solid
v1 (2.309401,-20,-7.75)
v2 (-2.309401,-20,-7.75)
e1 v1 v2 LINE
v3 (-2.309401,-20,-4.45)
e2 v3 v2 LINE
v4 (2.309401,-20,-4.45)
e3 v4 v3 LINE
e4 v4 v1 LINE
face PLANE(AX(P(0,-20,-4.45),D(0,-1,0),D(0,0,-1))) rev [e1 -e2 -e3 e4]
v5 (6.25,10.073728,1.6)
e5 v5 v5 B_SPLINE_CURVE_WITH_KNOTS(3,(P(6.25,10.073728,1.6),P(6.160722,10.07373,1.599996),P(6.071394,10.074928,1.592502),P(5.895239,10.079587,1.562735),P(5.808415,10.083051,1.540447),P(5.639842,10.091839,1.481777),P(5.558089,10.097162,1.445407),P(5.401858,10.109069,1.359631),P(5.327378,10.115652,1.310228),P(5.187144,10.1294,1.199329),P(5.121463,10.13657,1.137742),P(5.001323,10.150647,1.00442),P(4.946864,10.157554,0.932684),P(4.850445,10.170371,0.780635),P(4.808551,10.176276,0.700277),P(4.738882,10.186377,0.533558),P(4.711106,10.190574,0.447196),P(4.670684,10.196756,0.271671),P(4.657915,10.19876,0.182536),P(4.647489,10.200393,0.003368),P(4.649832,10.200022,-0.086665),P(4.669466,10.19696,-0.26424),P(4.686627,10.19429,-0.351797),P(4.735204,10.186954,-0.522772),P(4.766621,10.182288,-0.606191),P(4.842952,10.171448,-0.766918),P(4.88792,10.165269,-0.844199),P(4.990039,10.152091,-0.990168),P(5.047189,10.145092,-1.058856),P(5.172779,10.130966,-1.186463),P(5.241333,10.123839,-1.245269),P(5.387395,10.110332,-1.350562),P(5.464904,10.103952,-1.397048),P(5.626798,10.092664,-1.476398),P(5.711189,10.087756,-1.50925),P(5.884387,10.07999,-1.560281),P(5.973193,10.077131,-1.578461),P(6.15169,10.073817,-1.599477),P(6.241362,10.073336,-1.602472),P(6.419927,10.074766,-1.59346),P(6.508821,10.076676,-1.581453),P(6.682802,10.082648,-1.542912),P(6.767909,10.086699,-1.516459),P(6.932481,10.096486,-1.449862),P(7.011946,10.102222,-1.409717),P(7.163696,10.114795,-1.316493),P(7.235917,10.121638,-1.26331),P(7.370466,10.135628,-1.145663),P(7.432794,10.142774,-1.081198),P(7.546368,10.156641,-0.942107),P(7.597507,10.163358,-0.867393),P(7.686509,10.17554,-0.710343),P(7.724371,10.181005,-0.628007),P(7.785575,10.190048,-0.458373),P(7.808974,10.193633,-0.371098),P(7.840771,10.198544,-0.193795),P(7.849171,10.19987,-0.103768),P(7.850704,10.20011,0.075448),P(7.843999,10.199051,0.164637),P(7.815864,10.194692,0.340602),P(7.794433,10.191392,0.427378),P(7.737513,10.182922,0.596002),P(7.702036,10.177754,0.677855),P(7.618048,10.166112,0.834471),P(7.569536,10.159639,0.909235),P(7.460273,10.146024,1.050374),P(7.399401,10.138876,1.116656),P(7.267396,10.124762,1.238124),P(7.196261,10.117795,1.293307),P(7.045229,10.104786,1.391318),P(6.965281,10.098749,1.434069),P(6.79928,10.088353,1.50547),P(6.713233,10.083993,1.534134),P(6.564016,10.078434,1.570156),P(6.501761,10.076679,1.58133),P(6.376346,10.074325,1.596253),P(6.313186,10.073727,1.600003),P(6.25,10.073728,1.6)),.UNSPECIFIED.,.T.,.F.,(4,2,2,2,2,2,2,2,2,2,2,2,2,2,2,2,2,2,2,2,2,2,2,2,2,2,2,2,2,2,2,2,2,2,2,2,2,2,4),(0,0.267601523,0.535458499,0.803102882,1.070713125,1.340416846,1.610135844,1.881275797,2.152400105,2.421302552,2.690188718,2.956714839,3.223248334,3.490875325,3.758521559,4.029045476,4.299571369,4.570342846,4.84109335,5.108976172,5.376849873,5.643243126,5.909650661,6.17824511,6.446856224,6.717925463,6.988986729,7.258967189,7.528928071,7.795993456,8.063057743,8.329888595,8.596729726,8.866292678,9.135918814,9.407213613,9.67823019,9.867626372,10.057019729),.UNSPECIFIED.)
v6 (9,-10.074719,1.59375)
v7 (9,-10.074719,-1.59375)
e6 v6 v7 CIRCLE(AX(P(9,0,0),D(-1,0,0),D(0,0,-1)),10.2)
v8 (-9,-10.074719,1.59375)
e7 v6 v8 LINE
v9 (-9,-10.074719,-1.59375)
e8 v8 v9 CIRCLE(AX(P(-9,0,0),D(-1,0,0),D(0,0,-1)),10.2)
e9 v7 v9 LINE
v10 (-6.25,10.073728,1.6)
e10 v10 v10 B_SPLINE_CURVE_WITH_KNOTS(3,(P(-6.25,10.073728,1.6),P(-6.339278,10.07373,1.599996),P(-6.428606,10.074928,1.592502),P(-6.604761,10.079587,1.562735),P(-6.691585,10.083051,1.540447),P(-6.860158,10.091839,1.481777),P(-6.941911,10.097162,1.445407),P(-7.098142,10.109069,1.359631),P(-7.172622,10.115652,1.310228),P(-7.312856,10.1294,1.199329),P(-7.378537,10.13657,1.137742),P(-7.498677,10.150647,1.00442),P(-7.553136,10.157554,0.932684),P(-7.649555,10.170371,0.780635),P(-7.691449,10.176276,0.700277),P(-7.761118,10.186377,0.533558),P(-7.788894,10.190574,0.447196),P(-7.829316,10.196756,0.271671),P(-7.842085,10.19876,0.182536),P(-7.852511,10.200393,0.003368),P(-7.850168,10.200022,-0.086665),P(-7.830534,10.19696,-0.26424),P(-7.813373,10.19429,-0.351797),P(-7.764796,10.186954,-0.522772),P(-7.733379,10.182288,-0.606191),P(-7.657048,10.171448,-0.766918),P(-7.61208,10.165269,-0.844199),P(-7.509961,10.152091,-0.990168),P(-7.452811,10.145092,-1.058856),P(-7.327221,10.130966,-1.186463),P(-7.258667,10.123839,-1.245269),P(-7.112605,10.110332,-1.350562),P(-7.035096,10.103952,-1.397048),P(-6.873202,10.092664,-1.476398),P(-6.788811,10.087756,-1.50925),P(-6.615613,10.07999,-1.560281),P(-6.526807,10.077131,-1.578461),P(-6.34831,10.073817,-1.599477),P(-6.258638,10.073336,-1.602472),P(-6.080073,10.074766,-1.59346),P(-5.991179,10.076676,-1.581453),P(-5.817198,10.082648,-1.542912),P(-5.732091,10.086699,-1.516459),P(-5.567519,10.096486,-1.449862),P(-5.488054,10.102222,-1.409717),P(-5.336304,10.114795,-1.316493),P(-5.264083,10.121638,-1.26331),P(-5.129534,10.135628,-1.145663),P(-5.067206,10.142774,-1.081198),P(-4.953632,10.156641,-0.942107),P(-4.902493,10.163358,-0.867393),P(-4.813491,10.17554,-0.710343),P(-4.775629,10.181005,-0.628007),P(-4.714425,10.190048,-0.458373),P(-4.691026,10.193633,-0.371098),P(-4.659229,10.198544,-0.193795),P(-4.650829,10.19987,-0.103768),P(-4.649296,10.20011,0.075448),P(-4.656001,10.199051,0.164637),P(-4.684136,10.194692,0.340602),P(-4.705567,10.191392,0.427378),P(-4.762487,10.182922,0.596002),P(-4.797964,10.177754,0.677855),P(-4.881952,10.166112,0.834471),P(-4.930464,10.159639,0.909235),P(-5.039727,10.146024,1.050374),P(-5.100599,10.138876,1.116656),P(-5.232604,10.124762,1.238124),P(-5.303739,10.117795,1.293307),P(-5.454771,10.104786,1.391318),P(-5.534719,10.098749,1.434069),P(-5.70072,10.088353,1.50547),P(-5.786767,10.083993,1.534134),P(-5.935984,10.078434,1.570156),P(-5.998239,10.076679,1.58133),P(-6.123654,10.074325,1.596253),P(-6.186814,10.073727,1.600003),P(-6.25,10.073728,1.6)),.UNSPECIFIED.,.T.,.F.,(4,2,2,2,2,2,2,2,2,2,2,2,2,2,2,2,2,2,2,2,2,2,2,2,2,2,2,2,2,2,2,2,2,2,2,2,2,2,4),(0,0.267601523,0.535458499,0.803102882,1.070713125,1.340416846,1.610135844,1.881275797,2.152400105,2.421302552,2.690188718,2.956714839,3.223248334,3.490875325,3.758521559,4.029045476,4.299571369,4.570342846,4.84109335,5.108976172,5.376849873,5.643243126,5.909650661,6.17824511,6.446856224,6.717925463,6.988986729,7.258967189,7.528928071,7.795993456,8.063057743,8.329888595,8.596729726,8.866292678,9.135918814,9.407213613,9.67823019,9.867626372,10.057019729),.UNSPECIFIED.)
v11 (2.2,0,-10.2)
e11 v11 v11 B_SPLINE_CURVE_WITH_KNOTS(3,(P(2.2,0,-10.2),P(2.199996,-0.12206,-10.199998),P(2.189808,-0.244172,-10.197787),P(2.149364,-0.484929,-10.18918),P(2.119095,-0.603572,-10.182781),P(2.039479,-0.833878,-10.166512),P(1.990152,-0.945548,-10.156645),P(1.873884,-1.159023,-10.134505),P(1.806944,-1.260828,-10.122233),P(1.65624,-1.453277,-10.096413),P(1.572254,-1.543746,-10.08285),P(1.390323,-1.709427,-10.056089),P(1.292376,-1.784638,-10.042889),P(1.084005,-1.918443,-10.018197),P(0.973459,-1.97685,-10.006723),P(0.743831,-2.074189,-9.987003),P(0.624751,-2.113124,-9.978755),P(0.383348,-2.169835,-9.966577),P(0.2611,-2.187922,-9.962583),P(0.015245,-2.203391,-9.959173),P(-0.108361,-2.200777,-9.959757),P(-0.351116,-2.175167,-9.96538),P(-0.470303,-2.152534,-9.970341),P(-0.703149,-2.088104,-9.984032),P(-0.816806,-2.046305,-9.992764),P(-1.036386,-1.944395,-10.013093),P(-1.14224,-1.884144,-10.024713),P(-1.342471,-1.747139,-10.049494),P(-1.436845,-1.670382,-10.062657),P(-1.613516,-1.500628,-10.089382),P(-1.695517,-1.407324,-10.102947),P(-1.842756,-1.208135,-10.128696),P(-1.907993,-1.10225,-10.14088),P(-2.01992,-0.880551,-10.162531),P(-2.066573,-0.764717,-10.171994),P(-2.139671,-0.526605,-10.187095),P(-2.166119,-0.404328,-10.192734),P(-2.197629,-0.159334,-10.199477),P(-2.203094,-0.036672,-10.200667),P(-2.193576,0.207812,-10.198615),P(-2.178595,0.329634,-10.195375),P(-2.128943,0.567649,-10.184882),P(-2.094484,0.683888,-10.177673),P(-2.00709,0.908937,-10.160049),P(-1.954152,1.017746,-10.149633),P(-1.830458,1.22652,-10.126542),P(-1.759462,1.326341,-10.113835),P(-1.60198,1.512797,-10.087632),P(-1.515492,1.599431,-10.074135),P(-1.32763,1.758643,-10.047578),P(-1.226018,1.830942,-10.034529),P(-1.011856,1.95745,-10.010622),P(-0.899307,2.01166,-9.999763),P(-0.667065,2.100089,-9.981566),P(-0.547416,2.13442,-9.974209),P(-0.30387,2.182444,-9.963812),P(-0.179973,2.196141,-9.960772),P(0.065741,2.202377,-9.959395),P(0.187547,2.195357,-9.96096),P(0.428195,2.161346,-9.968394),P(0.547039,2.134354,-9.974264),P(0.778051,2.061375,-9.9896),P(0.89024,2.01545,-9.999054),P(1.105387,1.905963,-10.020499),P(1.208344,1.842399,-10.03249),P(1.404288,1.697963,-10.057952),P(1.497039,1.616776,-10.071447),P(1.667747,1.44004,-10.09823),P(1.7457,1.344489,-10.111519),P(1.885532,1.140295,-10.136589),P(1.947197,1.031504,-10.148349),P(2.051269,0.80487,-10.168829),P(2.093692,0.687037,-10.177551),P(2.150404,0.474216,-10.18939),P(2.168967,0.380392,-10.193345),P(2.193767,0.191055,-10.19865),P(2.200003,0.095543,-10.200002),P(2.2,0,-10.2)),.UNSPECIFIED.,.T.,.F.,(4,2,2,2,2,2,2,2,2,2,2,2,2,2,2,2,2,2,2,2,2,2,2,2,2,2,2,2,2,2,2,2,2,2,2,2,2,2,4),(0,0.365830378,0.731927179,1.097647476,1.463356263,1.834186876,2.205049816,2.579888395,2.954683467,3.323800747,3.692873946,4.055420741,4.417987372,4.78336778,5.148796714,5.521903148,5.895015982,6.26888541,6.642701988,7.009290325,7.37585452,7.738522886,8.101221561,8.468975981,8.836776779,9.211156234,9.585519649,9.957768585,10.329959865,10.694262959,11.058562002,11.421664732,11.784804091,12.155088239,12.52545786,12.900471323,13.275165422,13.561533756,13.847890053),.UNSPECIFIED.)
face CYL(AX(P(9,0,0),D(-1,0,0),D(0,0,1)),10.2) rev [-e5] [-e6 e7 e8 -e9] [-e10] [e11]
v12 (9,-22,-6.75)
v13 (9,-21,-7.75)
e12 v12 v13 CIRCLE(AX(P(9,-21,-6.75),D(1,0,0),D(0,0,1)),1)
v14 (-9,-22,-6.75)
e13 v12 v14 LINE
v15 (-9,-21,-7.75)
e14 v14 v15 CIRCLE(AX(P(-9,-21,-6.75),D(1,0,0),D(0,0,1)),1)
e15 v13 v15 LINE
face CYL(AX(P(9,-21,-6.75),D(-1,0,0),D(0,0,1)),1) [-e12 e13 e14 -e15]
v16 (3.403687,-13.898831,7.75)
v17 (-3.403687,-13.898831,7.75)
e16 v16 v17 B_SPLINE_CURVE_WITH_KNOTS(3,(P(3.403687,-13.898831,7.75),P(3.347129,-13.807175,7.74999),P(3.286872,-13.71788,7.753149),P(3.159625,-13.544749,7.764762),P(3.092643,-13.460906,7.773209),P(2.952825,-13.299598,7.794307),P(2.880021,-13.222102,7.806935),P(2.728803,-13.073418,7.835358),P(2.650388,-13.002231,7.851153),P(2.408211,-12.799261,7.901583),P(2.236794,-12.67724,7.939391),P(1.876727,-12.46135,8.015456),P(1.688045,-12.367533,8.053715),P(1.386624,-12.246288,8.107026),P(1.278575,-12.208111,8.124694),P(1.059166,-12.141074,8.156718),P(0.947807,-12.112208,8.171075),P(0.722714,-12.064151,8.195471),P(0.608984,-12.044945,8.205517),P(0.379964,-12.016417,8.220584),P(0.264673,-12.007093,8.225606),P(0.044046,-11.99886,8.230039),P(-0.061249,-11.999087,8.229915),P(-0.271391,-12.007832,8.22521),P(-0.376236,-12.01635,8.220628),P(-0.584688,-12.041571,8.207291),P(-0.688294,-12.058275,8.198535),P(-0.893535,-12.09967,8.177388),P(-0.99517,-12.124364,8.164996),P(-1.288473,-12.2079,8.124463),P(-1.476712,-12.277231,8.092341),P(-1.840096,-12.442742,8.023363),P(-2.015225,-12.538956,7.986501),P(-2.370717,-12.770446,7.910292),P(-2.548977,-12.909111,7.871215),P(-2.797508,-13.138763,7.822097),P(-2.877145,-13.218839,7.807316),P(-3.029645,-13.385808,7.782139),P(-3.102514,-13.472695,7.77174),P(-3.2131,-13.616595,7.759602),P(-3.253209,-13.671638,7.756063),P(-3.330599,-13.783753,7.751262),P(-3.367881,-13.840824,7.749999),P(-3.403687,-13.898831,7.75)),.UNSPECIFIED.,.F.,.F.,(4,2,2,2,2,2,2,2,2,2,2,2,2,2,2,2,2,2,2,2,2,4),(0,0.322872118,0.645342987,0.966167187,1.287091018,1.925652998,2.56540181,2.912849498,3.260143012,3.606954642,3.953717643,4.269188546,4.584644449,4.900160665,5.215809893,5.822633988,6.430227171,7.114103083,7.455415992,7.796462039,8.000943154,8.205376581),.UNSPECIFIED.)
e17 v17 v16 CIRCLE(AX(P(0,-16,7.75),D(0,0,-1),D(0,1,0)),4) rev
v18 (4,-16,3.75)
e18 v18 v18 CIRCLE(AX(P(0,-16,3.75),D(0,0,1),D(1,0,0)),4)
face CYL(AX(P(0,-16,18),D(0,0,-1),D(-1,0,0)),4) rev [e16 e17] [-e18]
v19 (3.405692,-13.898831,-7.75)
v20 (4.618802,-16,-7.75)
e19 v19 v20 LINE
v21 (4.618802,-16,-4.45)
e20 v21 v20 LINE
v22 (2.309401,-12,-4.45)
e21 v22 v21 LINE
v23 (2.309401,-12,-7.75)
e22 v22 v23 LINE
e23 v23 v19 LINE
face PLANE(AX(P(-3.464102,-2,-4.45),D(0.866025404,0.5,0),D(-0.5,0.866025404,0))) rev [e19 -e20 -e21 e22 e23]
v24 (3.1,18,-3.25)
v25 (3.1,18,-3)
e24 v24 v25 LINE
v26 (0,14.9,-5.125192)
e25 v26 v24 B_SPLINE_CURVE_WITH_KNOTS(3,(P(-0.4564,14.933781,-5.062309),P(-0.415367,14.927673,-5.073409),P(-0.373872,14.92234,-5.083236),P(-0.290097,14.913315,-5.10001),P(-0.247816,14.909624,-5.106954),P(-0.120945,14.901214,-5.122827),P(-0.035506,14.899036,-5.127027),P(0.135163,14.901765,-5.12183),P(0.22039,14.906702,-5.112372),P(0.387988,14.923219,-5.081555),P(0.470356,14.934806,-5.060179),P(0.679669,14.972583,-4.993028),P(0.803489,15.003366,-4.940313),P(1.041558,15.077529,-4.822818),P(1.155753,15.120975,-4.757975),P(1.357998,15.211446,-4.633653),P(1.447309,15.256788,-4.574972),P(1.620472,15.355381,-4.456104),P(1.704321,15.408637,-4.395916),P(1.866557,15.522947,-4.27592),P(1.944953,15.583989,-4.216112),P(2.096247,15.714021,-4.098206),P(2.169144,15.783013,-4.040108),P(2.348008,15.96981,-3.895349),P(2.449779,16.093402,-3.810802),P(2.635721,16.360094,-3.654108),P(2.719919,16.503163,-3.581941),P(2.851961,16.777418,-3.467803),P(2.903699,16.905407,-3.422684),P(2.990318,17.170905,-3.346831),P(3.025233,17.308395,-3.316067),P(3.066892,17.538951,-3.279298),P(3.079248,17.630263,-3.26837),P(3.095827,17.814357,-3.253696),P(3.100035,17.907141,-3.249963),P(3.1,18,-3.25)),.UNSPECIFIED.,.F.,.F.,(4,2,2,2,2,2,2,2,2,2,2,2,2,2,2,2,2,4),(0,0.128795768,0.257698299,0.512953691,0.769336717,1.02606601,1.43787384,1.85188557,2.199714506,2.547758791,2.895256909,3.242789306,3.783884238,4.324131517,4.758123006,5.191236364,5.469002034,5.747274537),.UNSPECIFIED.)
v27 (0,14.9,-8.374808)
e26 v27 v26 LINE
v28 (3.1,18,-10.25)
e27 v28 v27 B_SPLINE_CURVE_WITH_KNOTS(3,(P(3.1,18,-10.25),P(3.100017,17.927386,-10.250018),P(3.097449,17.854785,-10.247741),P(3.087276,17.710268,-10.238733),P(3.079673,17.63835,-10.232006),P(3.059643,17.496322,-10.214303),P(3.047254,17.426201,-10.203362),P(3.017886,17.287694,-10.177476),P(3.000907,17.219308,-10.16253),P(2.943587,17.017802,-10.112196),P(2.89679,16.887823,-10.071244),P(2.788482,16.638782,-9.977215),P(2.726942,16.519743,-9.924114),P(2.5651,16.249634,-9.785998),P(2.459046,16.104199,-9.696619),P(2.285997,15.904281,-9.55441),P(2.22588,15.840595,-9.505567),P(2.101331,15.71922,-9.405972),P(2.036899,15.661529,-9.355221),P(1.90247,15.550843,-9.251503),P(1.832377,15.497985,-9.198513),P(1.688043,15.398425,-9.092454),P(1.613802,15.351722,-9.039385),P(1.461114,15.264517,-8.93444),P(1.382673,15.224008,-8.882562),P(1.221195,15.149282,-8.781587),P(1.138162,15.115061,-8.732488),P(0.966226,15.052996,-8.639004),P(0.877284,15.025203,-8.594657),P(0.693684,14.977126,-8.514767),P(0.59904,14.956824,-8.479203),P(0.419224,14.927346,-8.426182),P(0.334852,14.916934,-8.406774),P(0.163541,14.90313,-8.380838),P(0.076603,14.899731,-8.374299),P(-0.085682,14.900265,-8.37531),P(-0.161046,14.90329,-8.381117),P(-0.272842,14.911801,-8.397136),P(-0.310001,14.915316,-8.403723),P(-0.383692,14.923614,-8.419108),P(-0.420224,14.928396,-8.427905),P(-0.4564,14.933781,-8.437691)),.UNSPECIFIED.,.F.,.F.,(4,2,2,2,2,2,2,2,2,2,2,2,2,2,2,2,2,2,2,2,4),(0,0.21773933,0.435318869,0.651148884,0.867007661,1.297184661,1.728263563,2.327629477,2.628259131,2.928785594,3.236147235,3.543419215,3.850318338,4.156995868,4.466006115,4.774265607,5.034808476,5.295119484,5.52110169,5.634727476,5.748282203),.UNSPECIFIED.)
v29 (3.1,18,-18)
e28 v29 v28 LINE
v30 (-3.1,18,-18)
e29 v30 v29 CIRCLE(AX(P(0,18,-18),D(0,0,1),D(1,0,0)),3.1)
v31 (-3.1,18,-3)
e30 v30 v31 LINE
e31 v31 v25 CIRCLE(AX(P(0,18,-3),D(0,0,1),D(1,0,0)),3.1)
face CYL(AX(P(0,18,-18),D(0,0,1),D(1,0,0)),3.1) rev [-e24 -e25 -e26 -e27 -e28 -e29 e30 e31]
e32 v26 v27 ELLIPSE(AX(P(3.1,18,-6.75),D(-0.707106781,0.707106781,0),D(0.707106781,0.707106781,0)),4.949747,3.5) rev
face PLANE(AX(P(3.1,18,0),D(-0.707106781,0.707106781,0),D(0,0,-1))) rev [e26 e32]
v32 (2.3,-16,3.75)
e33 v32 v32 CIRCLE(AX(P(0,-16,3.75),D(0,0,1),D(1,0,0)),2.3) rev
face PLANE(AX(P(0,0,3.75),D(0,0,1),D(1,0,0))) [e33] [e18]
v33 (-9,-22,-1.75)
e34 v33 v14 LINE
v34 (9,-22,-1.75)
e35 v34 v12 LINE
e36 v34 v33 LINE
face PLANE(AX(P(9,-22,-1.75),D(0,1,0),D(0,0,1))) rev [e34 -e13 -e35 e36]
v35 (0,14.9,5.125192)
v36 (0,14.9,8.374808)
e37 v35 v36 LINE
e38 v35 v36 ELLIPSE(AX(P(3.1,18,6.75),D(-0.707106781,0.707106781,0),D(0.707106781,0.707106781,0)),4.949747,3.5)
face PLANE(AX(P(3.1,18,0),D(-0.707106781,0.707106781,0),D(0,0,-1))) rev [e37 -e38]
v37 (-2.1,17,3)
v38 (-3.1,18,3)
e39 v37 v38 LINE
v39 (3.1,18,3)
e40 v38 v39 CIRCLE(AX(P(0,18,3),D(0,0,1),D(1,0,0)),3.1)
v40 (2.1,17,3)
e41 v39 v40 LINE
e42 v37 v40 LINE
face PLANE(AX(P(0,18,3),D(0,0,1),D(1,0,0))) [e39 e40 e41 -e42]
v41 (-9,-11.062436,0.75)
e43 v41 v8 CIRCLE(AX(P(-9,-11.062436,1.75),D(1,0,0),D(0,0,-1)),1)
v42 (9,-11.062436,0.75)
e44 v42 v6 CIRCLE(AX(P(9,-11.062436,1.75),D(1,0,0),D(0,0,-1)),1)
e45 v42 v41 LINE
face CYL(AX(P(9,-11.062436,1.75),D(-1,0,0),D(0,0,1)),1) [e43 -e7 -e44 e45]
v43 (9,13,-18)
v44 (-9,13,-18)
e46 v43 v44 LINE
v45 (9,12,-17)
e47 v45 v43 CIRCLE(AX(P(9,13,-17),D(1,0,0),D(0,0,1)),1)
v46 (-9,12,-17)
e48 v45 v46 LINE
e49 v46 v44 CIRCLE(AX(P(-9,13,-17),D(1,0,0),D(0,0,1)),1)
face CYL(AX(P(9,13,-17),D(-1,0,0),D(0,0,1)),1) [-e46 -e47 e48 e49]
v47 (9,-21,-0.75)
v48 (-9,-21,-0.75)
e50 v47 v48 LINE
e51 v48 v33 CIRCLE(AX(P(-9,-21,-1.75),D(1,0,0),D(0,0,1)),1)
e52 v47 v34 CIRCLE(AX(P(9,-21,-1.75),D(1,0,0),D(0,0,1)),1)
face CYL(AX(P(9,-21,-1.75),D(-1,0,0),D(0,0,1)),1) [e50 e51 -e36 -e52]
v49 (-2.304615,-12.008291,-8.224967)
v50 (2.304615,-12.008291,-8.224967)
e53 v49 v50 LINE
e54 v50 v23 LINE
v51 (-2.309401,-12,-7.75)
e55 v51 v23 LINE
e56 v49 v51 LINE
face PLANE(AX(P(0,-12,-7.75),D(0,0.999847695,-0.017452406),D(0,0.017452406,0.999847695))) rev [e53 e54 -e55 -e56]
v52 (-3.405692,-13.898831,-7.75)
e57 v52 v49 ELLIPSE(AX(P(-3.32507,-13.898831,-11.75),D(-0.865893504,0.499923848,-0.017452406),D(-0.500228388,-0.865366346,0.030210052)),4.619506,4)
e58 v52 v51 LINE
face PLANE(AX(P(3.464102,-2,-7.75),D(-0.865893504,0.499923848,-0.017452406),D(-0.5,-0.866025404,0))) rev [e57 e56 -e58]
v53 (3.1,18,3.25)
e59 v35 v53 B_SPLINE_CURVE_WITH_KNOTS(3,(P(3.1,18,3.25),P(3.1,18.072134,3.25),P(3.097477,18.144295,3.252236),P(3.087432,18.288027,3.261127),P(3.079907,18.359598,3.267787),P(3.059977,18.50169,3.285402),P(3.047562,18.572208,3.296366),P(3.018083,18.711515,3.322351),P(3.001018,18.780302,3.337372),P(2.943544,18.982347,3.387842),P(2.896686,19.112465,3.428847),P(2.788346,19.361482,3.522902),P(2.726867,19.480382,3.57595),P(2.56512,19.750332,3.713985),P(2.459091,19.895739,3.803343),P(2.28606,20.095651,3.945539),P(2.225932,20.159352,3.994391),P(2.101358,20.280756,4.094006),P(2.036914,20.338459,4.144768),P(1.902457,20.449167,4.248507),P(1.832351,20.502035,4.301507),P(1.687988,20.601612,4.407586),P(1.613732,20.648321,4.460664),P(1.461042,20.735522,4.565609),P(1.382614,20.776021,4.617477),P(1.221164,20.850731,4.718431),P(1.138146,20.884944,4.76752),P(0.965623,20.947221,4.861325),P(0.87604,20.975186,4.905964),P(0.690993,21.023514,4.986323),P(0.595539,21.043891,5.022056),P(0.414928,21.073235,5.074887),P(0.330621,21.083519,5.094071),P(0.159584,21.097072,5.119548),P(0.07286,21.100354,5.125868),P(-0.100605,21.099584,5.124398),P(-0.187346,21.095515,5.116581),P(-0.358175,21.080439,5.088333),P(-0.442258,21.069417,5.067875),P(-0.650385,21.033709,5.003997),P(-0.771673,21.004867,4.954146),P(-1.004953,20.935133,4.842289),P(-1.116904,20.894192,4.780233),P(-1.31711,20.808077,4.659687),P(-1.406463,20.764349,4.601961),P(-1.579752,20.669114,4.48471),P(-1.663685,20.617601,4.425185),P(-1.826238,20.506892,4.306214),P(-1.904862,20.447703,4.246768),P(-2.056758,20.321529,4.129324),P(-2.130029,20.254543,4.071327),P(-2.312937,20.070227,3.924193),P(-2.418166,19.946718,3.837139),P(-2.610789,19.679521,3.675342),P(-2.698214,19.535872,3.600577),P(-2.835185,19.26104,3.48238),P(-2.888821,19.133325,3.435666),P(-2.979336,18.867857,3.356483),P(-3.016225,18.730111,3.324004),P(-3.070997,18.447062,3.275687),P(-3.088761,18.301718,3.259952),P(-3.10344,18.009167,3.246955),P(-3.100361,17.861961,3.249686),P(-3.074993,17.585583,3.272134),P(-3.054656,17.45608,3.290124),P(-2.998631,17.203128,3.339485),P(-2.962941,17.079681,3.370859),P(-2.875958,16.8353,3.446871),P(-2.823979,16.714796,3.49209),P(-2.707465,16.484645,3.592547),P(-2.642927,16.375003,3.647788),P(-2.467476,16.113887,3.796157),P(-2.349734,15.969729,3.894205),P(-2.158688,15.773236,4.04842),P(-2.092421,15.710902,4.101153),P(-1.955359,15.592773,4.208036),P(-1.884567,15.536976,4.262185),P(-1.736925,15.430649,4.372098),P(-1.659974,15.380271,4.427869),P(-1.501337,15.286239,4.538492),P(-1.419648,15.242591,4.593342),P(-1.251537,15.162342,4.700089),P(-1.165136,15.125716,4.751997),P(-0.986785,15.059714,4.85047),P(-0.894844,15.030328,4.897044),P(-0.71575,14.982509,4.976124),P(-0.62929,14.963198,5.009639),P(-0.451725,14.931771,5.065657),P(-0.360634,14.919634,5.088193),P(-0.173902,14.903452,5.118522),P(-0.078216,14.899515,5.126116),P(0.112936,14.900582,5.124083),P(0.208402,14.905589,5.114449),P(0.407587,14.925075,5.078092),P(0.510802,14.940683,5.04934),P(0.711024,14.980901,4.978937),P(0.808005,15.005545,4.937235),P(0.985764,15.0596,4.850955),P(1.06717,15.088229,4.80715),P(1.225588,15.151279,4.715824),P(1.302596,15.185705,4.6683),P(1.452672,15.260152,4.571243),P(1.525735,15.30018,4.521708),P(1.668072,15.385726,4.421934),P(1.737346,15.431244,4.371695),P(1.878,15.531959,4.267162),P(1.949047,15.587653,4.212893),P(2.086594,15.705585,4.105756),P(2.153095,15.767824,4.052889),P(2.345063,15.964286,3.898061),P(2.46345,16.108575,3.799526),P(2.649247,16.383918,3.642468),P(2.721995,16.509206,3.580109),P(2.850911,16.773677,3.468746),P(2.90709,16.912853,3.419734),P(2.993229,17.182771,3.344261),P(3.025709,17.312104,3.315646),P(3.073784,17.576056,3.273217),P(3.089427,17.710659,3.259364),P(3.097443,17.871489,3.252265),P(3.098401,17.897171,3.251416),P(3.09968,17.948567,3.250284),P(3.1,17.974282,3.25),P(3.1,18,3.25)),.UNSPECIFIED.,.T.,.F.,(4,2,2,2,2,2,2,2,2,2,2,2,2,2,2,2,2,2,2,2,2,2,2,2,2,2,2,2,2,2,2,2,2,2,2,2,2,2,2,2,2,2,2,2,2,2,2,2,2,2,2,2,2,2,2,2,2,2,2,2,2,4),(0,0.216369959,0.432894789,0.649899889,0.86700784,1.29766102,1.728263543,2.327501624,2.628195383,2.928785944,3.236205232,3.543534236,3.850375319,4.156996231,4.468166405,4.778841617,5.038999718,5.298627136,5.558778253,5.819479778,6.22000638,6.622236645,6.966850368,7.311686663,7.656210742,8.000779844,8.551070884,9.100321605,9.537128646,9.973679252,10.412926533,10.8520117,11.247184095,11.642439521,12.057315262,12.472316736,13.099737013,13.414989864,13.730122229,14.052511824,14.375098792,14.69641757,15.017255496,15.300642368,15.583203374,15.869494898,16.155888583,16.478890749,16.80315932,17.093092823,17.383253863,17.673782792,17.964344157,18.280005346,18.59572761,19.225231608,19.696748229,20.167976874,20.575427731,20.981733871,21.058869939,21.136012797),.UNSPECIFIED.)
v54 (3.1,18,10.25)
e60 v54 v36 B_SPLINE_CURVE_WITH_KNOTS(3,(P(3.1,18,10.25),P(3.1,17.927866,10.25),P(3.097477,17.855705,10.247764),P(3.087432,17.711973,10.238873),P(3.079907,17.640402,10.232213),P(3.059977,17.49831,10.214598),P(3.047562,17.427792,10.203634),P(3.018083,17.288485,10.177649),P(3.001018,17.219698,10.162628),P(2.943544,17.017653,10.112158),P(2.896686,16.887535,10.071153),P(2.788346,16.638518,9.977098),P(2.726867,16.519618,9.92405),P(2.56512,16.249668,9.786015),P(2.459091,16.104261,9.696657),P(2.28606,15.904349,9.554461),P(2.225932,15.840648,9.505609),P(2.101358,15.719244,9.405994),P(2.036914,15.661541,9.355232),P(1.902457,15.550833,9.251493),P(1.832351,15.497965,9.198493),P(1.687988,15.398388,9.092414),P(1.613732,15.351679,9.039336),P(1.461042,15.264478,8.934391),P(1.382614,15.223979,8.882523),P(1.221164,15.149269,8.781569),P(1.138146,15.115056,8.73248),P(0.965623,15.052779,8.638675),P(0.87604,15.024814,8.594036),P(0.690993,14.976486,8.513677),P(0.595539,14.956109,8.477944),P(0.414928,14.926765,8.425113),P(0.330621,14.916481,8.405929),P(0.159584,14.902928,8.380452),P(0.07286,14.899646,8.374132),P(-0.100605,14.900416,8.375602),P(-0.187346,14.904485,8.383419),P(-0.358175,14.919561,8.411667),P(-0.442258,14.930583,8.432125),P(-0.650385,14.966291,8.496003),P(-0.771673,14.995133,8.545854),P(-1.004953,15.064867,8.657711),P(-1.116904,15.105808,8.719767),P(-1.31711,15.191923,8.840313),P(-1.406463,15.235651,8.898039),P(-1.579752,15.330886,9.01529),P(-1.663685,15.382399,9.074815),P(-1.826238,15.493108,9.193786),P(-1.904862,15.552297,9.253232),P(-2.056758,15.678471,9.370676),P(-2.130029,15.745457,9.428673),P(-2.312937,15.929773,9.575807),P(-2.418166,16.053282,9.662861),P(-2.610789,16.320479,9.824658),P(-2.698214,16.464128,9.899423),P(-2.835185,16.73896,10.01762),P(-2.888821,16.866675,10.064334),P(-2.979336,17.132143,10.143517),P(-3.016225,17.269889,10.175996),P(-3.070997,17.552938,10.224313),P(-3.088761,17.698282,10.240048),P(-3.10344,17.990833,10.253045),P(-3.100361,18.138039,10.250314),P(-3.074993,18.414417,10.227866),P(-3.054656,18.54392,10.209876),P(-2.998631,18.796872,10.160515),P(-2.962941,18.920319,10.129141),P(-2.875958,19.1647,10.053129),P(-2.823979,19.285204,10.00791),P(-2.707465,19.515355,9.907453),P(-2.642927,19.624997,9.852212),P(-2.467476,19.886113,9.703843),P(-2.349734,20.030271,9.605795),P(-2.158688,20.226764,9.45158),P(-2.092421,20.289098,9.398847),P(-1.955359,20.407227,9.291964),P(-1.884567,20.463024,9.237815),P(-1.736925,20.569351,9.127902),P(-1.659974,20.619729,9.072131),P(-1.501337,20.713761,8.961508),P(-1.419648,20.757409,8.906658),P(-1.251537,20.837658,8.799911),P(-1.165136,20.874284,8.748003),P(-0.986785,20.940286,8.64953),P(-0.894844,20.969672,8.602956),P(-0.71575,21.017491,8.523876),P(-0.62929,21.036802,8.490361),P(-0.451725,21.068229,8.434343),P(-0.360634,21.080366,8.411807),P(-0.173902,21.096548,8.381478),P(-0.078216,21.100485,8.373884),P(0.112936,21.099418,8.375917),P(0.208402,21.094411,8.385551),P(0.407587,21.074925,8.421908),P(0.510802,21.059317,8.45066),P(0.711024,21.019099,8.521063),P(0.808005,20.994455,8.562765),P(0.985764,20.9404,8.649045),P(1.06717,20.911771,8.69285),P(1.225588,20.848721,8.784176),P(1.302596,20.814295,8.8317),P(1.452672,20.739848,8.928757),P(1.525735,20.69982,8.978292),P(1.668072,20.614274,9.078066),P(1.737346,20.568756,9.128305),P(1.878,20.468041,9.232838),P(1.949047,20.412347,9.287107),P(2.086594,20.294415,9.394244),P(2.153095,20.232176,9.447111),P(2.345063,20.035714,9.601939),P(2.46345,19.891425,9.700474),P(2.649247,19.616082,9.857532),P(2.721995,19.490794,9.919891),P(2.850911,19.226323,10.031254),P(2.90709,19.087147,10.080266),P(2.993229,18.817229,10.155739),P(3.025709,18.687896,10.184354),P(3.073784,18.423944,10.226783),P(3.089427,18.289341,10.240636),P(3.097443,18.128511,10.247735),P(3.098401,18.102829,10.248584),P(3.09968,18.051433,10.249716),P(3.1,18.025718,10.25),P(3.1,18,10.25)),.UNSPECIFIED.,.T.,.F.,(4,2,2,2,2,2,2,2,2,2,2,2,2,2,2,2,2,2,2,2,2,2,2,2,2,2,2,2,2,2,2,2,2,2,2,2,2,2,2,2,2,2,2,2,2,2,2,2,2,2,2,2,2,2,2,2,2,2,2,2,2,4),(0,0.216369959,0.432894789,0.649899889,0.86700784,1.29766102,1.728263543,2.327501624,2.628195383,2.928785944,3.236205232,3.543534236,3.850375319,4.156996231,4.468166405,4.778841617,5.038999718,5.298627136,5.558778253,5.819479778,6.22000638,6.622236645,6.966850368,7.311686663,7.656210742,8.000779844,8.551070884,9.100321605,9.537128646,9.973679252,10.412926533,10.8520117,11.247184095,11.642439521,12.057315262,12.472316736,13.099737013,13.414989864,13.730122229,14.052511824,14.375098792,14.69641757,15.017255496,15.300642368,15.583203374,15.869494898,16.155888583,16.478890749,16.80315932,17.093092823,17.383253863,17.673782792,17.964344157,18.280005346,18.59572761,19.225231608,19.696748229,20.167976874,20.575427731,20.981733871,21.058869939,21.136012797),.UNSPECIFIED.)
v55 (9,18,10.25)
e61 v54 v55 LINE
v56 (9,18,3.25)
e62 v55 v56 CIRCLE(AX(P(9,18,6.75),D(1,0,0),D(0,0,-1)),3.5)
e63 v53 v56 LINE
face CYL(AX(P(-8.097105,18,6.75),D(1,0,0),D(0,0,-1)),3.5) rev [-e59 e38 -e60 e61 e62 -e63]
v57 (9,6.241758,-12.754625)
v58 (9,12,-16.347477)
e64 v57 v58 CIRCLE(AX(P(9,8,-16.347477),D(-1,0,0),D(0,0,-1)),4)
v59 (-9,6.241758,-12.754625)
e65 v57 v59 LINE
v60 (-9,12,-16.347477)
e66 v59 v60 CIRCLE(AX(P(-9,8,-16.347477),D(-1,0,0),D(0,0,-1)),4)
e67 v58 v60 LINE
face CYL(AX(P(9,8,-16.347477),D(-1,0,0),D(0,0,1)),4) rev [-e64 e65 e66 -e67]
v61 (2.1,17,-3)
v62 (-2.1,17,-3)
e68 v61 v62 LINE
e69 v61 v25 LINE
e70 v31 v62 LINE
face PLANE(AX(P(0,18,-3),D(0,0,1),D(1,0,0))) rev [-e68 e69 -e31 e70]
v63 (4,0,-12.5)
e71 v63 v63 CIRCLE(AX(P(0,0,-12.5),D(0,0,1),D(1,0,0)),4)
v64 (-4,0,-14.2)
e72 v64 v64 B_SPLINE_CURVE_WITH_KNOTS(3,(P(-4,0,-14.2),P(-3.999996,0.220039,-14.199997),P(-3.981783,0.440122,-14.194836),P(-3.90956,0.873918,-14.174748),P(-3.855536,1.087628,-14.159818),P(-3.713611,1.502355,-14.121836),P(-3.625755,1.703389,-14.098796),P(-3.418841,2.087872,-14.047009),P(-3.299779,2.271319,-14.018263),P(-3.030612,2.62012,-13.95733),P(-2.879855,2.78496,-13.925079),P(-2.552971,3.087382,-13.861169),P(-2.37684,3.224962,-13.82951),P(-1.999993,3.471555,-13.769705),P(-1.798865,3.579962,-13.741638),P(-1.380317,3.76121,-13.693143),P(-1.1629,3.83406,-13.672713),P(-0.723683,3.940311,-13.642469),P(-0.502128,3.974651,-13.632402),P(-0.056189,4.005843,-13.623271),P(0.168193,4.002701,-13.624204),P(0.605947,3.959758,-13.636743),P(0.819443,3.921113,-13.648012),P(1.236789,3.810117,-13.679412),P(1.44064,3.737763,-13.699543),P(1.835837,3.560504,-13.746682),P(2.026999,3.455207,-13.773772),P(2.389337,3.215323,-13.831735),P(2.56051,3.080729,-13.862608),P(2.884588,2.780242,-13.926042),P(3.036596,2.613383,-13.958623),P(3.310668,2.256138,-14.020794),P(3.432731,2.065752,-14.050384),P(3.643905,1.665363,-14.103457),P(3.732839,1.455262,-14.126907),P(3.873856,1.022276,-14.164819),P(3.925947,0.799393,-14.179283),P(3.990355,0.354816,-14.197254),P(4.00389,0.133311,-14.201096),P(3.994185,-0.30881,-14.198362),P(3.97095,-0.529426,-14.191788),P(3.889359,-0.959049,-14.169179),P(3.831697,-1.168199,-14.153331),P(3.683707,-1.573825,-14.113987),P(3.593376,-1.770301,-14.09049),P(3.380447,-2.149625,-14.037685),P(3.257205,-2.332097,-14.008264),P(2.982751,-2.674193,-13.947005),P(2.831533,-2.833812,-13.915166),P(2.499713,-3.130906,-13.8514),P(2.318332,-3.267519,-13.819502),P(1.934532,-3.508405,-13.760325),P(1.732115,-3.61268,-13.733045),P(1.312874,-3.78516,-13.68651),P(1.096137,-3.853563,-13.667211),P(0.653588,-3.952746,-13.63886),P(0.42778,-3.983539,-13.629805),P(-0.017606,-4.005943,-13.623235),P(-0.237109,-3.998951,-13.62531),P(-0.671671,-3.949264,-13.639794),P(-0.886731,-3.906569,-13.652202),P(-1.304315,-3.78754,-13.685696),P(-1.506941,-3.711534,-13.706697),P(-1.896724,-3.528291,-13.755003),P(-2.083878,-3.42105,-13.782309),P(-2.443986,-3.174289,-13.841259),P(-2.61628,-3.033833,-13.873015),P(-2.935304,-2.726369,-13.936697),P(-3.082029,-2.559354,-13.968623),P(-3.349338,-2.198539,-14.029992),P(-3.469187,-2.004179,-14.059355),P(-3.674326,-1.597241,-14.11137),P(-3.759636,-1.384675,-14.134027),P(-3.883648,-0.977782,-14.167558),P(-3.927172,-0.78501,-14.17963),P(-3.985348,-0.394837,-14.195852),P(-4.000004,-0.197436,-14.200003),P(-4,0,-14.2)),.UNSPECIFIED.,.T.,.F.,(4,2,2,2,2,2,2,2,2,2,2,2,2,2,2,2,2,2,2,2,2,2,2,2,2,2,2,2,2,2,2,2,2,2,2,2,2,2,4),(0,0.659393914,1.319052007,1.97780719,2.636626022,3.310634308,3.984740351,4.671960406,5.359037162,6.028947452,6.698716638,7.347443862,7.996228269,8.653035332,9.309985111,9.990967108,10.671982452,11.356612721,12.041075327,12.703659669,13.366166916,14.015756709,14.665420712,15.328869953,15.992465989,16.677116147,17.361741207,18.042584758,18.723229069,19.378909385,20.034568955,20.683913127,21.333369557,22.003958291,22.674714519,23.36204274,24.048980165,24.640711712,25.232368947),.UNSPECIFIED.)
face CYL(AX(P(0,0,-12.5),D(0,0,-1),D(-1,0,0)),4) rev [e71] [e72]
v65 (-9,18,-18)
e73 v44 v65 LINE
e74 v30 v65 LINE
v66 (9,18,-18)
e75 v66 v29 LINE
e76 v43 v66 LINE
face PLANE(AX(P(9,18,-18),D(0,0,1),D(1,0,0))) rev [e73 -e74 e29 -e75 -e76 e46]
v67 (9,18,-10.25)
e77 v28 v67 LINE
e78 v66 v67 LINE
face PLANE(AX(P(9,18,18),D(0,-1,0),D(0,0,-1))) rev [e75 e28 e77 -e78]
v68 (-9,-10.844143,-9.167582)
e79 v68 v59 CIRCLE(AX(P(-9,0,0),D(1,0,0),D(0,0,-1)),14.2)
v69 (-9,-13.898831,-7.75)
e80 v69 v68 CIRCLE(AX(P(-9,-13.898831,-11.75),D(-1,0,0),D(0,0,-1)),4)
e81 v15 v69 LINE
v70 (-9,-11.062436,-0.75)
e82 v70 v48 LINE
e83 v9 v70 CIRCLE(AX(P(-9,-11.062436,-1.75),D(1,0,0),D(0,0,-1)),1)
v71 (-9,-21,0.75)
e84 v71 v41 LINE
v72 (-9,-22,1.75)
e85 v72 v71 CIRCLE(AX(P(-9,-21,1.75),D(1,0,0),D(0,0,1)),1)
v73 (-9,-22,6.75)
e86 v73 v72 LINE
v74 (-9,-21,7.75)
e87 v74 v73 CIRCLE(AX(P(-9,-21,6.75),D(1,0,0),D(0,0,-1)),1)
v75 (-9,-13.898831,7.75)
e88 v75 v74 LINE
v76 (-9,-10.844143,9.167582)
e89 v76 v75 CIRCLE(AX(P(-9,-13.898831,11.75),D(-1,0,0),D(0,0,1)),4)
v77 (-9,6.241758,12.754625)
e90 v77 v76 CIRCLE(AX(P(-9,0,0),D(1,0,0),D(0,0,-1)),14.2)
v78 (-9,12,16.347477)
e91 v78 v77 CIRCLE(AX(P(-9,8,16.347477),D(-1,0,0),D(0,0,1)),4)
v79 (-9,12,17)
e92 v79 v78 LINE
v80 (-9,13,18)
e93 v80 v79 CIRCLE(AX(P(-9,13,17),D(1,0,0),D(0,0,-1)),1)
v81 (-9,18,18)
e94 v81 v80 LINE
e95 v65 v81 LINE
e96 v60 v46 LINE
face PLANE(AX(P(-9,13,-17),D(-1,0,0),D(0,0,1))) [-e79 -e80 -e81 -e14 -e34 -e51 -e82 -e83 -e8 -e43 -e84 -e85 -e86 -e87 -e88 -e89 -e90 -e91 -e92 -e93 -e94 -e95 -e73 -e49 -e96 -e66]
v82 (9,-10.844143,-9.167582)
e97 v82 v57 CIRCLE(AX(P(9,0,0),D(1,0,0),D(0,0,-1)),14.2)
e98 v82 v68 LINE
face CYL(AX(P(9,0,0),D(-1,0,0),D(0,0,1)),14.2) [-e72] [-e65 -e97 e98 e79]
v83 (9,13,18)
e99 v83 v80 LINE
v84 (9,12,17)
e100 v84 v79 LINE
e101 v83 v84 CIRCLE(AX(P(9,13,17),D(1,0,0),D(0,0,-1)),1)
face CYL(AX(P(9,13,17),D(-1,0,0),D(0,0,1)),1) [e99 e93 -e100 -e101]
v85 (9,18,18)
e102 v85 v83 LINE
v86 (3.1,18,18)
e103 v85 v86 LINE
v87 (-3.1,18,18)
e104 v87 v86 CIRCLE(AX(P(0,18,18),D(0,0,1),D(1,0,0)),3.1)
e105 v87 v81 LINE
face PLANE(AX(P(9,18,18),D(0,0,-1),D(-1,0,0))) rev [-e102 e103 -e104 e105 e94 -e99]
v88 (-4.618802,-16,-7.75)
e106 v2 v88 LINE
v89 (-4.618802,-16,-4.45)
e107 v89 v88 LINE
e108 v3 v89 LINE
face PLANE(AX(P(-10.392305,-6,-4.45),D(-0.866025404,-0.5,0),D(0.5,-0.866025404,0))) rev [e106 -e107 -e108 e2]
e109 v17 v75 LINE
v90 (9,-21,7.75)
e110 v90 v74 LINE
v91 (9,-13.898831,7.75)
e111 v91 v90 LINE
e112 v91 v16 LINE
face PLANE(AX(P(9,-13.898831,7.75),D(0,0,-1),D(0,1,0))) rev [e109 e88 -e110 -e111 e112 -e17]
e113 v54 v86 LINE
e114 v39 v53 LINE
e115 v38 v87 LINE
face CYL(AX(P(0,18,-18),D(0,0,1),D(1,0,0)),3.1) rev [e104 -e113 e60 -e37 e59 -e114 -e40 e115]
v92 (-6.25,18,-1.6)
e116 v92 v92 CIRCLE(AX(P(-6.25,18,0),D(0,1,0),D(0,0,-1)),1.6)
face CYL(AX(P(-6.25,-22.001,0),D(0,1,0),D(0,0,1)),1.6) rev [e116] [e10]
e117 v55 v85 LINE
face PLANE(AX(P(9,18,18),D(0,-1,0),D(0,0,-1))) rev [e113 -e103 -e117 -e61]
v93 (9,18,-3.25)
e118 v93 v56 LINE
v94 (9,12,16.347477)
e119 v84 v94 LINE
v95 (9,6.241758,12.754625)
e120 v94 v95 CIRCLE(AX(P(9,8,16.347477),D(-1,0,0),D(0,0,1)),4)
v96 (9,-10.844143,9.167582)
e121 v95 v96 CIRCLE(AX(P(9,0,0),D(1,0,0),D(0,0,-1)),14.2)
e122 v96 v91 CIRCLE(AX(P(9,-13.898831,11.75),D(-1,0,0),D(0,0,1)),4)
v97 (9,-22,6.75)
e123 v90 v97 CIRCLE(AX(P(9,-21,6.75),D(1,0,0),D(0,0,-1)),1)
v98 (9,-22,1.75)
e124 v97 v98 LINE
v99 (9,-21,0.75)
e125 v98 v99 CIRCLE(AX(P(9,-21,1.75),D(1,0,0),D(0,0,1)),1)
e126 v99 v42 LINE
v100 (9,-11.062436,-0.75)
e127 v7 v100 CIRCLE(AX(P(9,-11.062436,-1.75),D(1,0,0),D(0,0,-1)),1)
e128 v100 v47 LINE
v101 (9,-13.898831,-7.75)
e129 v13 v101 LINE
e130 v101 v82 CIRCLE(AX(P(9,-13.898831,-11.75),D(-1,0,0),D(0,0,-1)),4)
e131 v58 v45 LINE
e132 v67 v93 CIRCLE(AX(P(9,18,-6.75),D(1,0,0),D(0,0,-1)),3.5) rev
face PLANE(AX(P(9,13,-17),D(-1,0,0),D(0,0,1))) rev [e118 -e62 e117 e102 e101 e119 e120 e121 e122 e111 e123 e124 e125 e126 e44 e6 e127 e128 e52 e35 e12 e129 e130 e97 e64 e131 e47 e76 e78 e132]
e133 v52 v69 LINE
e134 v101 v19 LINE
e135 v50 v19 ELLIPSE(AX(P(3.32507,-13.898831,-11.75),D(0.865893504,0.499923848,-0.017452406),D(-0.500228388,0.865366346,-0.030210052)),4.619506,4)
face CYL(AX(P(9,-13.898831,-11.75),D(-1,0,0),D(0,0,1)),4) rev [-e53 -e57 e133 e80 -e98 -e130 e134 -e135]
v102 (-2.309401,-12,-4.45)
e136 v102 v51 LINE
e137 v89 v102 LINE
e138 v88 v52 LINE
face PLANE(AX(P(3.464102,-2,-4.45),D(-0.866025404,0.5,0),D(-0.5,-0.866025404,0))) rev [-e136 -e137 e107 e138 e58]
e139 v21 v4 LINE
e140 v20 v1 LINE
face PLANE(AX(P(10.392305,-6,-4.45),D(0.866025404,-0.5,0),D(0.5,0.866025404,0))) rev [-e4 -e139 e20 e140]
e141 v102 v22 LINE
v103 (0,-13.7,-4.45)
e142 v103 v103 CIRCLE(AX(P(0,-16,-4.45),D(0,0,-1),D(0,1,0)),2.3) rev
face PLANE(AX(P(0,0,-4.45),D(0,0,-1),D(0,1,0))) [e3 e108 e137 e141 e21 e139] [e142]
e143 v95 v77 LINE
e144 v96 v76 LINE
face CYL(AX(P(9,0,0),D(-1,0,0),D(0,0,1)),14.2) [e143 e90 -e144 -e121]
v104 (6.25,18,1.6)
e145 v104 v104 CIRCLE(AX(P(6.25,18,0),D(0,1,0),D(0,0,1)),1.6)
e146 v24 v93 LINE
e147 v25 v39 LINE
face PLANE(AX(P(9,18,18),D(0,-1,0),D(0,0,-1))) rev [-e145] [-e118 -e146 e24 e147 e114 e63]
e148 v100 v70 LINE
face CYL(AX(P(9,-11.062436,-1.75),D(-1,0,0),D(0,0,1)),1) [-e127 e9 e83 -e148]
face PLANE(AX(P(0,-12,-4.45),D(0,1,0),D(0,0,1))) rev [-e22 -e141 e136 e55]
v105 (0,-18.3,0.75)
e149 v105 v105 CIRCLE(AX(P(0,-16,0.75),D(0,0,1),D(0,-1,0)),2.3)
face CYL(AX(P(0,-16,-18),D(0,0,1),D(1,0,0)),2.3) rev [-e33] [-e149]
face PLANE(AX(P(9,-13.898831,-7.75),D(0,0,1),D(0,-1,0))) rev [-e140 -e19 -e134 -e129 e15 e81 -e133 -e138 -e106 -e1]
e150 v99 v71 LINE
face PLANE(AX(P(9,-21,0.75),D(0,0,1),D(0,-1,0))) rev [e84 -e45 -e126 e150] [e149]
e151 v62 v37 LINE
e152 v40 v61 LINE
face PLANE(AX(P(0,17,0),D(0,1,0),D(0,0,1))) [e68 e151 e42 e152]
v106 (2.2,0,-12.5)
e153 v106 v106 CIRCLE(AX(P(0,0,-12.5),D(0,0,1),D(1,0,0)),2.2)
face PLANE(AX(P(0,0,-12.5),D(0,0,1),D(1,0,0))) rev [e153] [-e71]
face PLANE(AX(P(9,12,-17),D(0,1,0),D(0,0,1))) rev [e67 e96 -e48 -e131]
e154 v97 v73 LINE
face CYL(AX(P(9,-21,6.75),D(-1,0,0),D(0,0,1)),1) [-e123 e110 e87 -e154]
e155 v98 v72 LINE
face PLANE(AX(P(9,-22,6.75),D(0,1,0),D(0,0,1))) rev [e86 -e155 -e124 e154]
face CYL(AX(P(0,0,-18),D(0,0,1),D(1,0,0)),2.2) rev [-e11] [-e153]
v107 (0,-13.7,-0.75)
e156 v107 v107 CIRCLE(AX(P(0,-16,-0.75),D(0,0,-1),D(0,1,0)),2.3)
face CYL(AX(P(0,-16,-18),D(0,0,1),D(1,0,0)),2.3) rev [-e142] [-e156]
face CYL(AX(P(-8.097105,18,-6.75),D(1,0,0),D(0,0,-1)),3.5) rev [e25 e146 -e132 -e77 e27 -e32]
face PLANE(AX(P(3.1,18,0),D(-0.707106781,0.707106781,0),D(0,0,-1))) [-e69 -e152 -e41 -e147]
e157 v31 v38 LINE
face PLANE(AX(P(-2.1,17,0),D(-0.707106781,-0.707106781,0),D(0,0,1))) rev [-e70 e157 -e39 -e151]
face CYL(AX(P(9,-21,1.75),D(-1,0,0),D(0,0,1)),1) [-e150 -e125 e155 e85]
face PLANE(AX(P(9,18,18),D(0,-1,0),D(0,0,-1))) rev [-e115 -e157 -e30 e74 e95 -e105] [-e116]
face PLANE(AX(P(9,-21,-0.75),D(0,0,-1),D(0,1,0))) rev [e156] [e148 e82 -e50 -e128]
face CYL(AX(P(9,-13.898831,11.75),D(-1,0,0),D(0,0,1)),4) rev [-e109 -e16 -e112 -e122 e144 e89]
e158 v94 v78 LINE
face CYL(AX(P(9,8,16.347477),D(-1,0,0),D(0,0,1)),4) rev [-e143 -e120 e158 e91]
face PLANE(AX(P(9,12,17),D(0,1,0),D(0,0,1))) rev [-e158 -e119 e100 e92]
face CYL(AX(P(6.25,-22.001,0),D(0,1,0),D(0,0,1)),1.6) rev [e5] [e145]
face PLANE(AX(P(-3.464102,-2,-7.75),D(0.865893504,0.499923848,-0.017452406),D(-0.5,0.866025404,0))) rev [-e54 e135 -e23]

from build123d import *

# Parameters (mm, degrees)
EXTRUDE_1_DEPTH               = 9
CUT_EXTRUDE_1_DEPTH           = 30.816103032
CUT_EXTRUDE_1_DEPTH_BACK      = 30.816103032
SKETCH_2_R                    = 2.3
CUT_EXTRUDE_2_DEPTH           = 3.3
CUT_EXTRUDE_2_OTHER_WAY_DEPTH = 36.043722716
CUT_EXTRUDE_2_OTHER_WAY_TAPER = 1
CUT_EXTRUDE_3_DEPTH           = 36.043722716
CUT_EXTRUDE_3_DEPTH_BACK      = 4
CUT_EXTRUDE_4_REACH           = 46.777
CUT_EXTRUDE_4_END_RADIUS      = 10.2
SKETCH_5_R                    = 1.6
EXTRUDE_2_DEPTH               = 3
SKETCH_7_W                    = 6.2
SKETCH_7_H                    = 6
CUT_EXTRUDE_6_DEPTH           = 1
CHAMFER_3_SIZE                = 1
CUT_EXTRUDE_8_REACH           = 35.645
SKETCH_9_R                    = 2.2
CUT_EXTRUDE_9_DEPTH           = 30.816103122
CUT_EXTRUDE_START             = 5.5
SKETCH_10_R                   = 4
SKETCH_10_R_2                 = 2.2
CUT_EXTRUDE_10_DEPTH          = 5.5


with BuildPart() as part:
    # Эскиз1 → Бобышка-Вытянуть1 (new, symmetric)
    with BuildSketch(Plane(origin=(0, 0, 0), x_dir=(0, 0, -1), z_dir=(1, 0, 0))):
        with BuildLine():
            Line((-0.75, -21), (-0.75, -11.06243644))
            ThreePointArc((-0.75, -11.06243644), (-0.989654684, -10.412917388), (-1.59375, -10.074718901))
            ThreePointArc((-1.59375, -10.074718901), (0, 10.2), (1.59375, -10.074718901))
            ThreePointArc((1.59375, -10.074718901), (0.989654684, -10.412917388), (0.75, -11.06243644))
            Line((0.75, -11.06243644), (0.75, -21))
            ThreePointArc((0.75, -21), (1.042893219, -21.707106781), (1.75, -22))
            Line((1.75, -22), (6.75, -22))
            ThreePointArc((6.75, -22), (7.457106781, -21.707106781), (7.75, -21))
            Line((7.75, -21), (7.75, -13.898830886))
            ThreePointArc((7.75, -13.898830886), (8.121662204, -12.215036114), (9.167582418, -10.844142779))
            ThreePointArc((9.167582418, -10.844142779), (13.897042702, -2.917568189), (12.75462481, 6.241758242))
            ThreePointArc((12.75462481, 6.241758242), (12.953882386, 10.117431577), (16.34747687, 12))
            Line((16.34747687, 12), (17, 12))
            ThreePointArc((17, 12), (17.707106781, 12.292893219), (18, 13))
            Line((18, 13), (18, 18))
            Line((18, 18), (-18, 18))
            Line((-18, 18), (-18, 13))
            ThreePointArc((-18, 13), (-17.707106781, 12.292893219), (-17, 12))
            Line((-17, 12), (-16.34747687, 12))
            ThreePointArc((-16.34747687, 12), (-12.953882386, 10.117431577), (-12.75462481, 6.241758242))
            ThreePointArc((-12.75462481, 6.241758242), (-13.897042702, -2.917568189), (-9.167582418, -10.844142779))
            ThreePointArc((-9.167582418, -10.844142779), (-8.121662204, -12.215036114), (-7.75, -13.898830886))
            Line((-7.75, -13.898830886), (-7.75, -21))
            ThreePointArc((-7.75, -21), (-7.457106781, -21.707106781), (-6.75, -22))
            Line((-6.75, -22), (-1.75, -22))
            ThreePointArc((-1.75, -22), (-1.042893219, -21.707106781), (-0.75, -21))
        make_face()
    extrude(amount=EXTRUDE_1_DEPTH, both=True)

    # Эскиз2 → Вырез-Вытянуть1 (cut, two sides: drawn at the far end of the back side and taken through both)
    with BuildSketch(Plane.XY.offset(-CUT_EXTRUDE_1_DEPTH_BACK)):
        with BuildLine():
            ThreePointArc((-3.1, 18), (0, 14.9), (3.1, 18))
            Line((3.1, 18), (-3.1, 18))
        make_face()
        with Locations(Location((0, -16, 0), (0, 0, 66.000891847))):
            Circle(SKETCH_2_R)
    extrude(amount=CUT_EXTRUDE_1_DEPTH + CUT_EXTRUDE_1_DEPTH_BACK, mode=Mode.SUBTRACT)

    # Эскиз3 → Вырез-Вытянуть2 (cut)
    with BuildSketch(Plane(origin=(0, 0, -7.75), x_dir=(-1, 0, 0), z_dir=(0, 0, -1))):
        Polygon((-4.618802154, -16), (-2.309401077, -20), (2.309401077, -20), (4.618802154, -16), (2.309401077, -12), (-2.309401077, -12), align=None)
    extrude(amount=-CUT_EXTRUDE_2_DEPTH, mode=Mode.SUBTRACT)

    # Эскиз3 → Вырез-Вытянуть2 other way (cut)
    with BuildSketch(Plane(origin=(0, 0, -7.75), x_dir=(-1, 0, 0), z_dir=(0, 0, -1))):
        Polygon((-4.618802154, -16), (-2.309401077, -20), (2.309401077, -20), (4.618802154, -16), (2.309401077, -12), (-2.309401077, -12), align=None)
    extrude(amount=CUT_EXTRUDE_2_OTHER_WAY_DEPTH, taper=CUT_EXTRUDE_2_OTHER_WAY_TAPER, mode=Mode.SUBTRACT)

    # Эскиз4 → Вырез-Вытянуть3 (cut, two sides: drawn at the far end of the back side and taken through both)
    with BuildSketch(Plane.XY.offset(7.75).offset(-CUT_EXTRUDE_3_DEPTH_BACK)):
        with BuildLine():
            Line((-3.403687464, -13.898830886), (-0.935461573, -13.898830886))
            ThreePointArc((-0.935461573, -13.898830886), (0, -18.3), (0.935461573, -13.898830886))
            Line((0.935461573, -13.898830886), (3.403687464, -13.898830886))
            ThreePointArc((3.403687464, -13.898830886), (0, -12), (-3.403687464, -13.898830886))
        make_face()
        with BuildLine():
            ThreePointArc((0.935461573, -13.898830886), (0, -18.3), (-0.935461573, -13.898830886))
            Line((-0.935461573, -13.898830886), (-3.403687464, -13.898830886))
            ThreePointArc((-3.403687464, -13.898830886), (-1.092073748, -19.848035204), (4, -16))
            ThreePointArc((4, -16), (3.848035204, -14.907926252), (3.403687464, -13.898830886))
            Line((3.403687464, -13.898830886), (0.935461573, -13.898830886))
        make_face()
        with BuildLine():
            Line((-3.403687464, -13.898830886), (-0.935461573, -13.898830886))
            ThreePointArc((-0.935461573, -13.898830886), (0, -18.3), (0.935461573, -13.898830886))
            Line((0.935461573, -13.898830886), (3.403687464, -13.898830886))
            ThreePointArc((3.403687464, -13.898830886), (0, -12), (-3.403687464, -13.898830886))
        make_face()
        with BuildLine():
            ThreePointArc((0.935461573, -13.898830886), (0, -18.3), (-0.935461573, -13.898830886))
            Line((-0.935461573, -13.898830886), (-3.403687464, -13.898830886))
            ThreePointArc((-3.403687464, -13.898830886), (-1.092073748, -19.848035204), (4, -16))
            ThreePointArc((4, -16), (3.848035204, -14.907926252), (3.403687464, -13.898830886))
            Line((3.403687464, -13.898830886), (0.935461573, -13.898830886))
        make_face()
    extrude(amount=CUT_EXTRUDE_3_DEPTH + CUT_EXTRUDE_3_DEPTH_BACK, mode=Mode.SUBTRACT)

    # Вырез-Вытянуть4: up to this cylinder (the profile starts outside it)
    cut_extrude_4_end = Plane(origin=(0, 0, 0), z_dir=(-1, 0, 0)) * Cylinder(CUT_EXTRUDE_4_END_RADIUS, 127.454, mode=Mode.PRIVATE)
    # Эскиз5 → Вырез-Вытянуть4 (cut, up to the surface)
    with BuildSketch(Plane(origin=(0, 18, 0), x_dir=(1, 0, 0), z_dir=(0, 1, 0)), mode=Mode.PRIVATE) as cut_extrude_4_sk1:
        with Locations(Location((6.25, 0, 0), (0, 0, 270))):
            Circle(SKETCH_5_R)
    cut_extrude_4_tool1 = extrude(cut_extrude_4_sk1.sketch, amount=-CUT_EXTRUDE_4_REACH, mode=Mode.PRIVATE) - cut_extrude_4_end
    add(cut_extrude_4_tool1.solids().sort_by_distance((6.25, 18, 0))[0], mode=Mode.SUBTRACT)
    # Эскиз5 → Вырез-Вытянуть4 (cut, up to the surface)
    with BuildSketch(Plane(origin=(0, 18, 0), x_dir=(1, 0, 0), z_dir=(0, 1, 0)), mode=Mode.PRIVATE) as cut_extrude_4_sk2:
        with Locations(Location((-6.25, 0, 0), (0, 0, 270))):
            Circle(SKETCH_5_R)
    cut_extrude_4_tool2 = extrude(cut_extrude_4_sk2.sketch, amount=-CUT_EXTRUDE_4_REACH, mode=Mode.PRIVATE) - cut_extrude_4_end
    add(cut_extrude_4_tool2.solids().sort_by_distance((-6.25, 18, 0))[0], mode=Mode.SUBTRACT)

    # Эскиз6 → Бобышка-Вытянуть2 (add, symmetric)
    with BuildSketch(Plane.XY):
        with BuildLine():
            Line((-3.1, 18), (3.1, 18))
            ThreePointArc((3.1, 18), (0, 14.9), (-3.1, 18))
        make_face()
    extrude(amount=EXTRUDE_2_DEPTH, both=True)

    # Эскиз7 → Вырез-Вытянуть6 (cut)
    with BuildSketch(Plane(origin=(0, 18, 0), x_dir=(1, 0, 0), z_dir=(0, 1, 0))):
        Rectangle(SKETCH_7_W, SKETCH_7_H)
    extrude(amount=-CUT_EXTRUDE_6_DEPTH, mode=Mode.SUBTRACT)

    # Фаска3
    # the kernel refuses this chamfer: 1 mm, written as the material it adds along each edge
    with BuildSketch(Plane(origin=(3.1, 17, -3), x_dir=(0.02749587661058651, 0.9996219169112968, 0), z_dir=(0, 0, 1))) as chamfer_3_piece_1_section:
        Polygon((CHAMFER_3_SIZE * 0.999621916911, CHAMFER_3_SIZE * 0.0274958766106), (-CHAMFER_3_SIZE * 0.0274958766106, CHAMFER_3_SIZE * 0.999621916911), (0, 0), align=None)
    chamfer_3_piece_1 = extrude(amount=6, mode=Mode.PRIVATE)
    chamfer_3_piece_1 = split(chamfer_3_piece_1, bisect_by=Plane(origin=(2.769595846, 18, 0), z_dir=(0, -1, 0)), keep=Keep.TOP, mode=Mode.PRIVATE)
    add(chamfer_3_piece_1)
    with BuildSketch(Plane(origin=(-3.1, 17, 3), x_dir=(-0.02749587661058651, 0.9996219169112968, 0), z_dir=(0, 0, -1))) as chamfer_3_piece_2_section:
        Polygon((CHAMFER_3_SIZE * 0.999621916911, CHAMFER_3_SIZE * 0.0274958766106), (-CHAMFER_3_SIZE * 0.0274958766106, CHAMFER_3_SIZE * 0.999621916911), (0, 0), align=None)
    chamfer_3_piece_2 = extrude(amount=6, mode=Mode.PRIVATE)
    chamfer_3_piece_2 = split(chamfer_3_piece_2, bisect_by=Plane(origin=(-2.769595846, 18, 0), z_dir=(0, -1, 0)), keep=Keep.TOP, mode=Mode.PRIVATE)
    add(chamfer_3_piece_2)

    # Вырез-Вытянуть8: up to this plane
    cut_extrude_8_end = Plane(origin=(3.1, 18, 0), z_dir=(-0.7071067811865525, 0.7071067811865426, 0))
    # Эскиз8 → Вырез-Вытянуть8 (cut, up to the surface)
    with BuildSketch(Plane(origin=(9, 0, 0), x_dir=(0, 0, -1), z_dir=(1, 0, 0)), mode=Mode.PRIVATE) as cut_extrude_8_sk1:
        with BuildLine():
            ThreePointArc((-10.25, 18), (-6.75, 14.5), (-3.25, 18))
            Line((-3.25, 18), (-10.25, 18))
        make_face()
    cut_extrude_8_tool1 = split(extrude(cut_extrude_8_sk1.sketch, amount=-CUT_EXTRUDE_8_REACH, mode=Mode.PRIVATE), bisect_by=cut_extrude_8_end, keep=Keep.BOTH, mode=Mode.PRIVATE)
    add(cut_extrude_8_tool1.solids().sort_by_distance((9, 16.514554, 6.75))[0], mode=Mode.SUBTRACT)
    # Эскиз8 → Вырез-Вытянуть8 (cut, up to the surface)
    with BuildSketch(Plane(origin=(9, 0, 0), x_dir=(0, 0, -1), z_dir=(1, 0, 0)), mode=Mode.PRIVATE) as cut_extrude_8_sk2:
        with BuildLine():
            ThreePointArc((3.25, 18), (6.75, 14.5), (10.25, 18))
            Line((10.25, 18), (3.25, 18))
        make_face()
    cut_extrude_8_tool2 = split(extrude(cut_extrude_8_sk2.sketch, amount=-CUT_EXTRUDE_8_REACH, mode=Mode.PRIVATE), bisect_by=cut_extrude_8_end, keep=Keep.BOTH, mode=Mode.PRIVATE)
    add(cut_extrude_8_tool2.solids().sort_by_distance((9, 16.514554, -6.75))[0], mode=Mode.SUBTRACT)

    # Эскиз9 → Вырез-Вытянуть9 (cut, through all)
    with BuildSketch(Plane.XY):
        Circle(SKETCH_9_R)
    extrude(amount=-CUT_EXTRUDE_9_DEPTH, mode=Mode.SUBTRACT)

    # Эскиз10 → Вырез-Вытянуть10 (cut)
    with BuildSketch(Plane.XY.offset(-18).offset(CUT_EXTRUDE_START)):
        with Locations(Location((0, 0, 0), (0, 0, 180))):
            Circle(SKETCH_10_R)
        Circle(SKETCH_10_R_2, mode=Mode.SUBTRACT)
    extrude(amount=-CUT_EXTRUDE_10_DEPTH, mode=Mode.SUBTRACT)


solid = part.part
